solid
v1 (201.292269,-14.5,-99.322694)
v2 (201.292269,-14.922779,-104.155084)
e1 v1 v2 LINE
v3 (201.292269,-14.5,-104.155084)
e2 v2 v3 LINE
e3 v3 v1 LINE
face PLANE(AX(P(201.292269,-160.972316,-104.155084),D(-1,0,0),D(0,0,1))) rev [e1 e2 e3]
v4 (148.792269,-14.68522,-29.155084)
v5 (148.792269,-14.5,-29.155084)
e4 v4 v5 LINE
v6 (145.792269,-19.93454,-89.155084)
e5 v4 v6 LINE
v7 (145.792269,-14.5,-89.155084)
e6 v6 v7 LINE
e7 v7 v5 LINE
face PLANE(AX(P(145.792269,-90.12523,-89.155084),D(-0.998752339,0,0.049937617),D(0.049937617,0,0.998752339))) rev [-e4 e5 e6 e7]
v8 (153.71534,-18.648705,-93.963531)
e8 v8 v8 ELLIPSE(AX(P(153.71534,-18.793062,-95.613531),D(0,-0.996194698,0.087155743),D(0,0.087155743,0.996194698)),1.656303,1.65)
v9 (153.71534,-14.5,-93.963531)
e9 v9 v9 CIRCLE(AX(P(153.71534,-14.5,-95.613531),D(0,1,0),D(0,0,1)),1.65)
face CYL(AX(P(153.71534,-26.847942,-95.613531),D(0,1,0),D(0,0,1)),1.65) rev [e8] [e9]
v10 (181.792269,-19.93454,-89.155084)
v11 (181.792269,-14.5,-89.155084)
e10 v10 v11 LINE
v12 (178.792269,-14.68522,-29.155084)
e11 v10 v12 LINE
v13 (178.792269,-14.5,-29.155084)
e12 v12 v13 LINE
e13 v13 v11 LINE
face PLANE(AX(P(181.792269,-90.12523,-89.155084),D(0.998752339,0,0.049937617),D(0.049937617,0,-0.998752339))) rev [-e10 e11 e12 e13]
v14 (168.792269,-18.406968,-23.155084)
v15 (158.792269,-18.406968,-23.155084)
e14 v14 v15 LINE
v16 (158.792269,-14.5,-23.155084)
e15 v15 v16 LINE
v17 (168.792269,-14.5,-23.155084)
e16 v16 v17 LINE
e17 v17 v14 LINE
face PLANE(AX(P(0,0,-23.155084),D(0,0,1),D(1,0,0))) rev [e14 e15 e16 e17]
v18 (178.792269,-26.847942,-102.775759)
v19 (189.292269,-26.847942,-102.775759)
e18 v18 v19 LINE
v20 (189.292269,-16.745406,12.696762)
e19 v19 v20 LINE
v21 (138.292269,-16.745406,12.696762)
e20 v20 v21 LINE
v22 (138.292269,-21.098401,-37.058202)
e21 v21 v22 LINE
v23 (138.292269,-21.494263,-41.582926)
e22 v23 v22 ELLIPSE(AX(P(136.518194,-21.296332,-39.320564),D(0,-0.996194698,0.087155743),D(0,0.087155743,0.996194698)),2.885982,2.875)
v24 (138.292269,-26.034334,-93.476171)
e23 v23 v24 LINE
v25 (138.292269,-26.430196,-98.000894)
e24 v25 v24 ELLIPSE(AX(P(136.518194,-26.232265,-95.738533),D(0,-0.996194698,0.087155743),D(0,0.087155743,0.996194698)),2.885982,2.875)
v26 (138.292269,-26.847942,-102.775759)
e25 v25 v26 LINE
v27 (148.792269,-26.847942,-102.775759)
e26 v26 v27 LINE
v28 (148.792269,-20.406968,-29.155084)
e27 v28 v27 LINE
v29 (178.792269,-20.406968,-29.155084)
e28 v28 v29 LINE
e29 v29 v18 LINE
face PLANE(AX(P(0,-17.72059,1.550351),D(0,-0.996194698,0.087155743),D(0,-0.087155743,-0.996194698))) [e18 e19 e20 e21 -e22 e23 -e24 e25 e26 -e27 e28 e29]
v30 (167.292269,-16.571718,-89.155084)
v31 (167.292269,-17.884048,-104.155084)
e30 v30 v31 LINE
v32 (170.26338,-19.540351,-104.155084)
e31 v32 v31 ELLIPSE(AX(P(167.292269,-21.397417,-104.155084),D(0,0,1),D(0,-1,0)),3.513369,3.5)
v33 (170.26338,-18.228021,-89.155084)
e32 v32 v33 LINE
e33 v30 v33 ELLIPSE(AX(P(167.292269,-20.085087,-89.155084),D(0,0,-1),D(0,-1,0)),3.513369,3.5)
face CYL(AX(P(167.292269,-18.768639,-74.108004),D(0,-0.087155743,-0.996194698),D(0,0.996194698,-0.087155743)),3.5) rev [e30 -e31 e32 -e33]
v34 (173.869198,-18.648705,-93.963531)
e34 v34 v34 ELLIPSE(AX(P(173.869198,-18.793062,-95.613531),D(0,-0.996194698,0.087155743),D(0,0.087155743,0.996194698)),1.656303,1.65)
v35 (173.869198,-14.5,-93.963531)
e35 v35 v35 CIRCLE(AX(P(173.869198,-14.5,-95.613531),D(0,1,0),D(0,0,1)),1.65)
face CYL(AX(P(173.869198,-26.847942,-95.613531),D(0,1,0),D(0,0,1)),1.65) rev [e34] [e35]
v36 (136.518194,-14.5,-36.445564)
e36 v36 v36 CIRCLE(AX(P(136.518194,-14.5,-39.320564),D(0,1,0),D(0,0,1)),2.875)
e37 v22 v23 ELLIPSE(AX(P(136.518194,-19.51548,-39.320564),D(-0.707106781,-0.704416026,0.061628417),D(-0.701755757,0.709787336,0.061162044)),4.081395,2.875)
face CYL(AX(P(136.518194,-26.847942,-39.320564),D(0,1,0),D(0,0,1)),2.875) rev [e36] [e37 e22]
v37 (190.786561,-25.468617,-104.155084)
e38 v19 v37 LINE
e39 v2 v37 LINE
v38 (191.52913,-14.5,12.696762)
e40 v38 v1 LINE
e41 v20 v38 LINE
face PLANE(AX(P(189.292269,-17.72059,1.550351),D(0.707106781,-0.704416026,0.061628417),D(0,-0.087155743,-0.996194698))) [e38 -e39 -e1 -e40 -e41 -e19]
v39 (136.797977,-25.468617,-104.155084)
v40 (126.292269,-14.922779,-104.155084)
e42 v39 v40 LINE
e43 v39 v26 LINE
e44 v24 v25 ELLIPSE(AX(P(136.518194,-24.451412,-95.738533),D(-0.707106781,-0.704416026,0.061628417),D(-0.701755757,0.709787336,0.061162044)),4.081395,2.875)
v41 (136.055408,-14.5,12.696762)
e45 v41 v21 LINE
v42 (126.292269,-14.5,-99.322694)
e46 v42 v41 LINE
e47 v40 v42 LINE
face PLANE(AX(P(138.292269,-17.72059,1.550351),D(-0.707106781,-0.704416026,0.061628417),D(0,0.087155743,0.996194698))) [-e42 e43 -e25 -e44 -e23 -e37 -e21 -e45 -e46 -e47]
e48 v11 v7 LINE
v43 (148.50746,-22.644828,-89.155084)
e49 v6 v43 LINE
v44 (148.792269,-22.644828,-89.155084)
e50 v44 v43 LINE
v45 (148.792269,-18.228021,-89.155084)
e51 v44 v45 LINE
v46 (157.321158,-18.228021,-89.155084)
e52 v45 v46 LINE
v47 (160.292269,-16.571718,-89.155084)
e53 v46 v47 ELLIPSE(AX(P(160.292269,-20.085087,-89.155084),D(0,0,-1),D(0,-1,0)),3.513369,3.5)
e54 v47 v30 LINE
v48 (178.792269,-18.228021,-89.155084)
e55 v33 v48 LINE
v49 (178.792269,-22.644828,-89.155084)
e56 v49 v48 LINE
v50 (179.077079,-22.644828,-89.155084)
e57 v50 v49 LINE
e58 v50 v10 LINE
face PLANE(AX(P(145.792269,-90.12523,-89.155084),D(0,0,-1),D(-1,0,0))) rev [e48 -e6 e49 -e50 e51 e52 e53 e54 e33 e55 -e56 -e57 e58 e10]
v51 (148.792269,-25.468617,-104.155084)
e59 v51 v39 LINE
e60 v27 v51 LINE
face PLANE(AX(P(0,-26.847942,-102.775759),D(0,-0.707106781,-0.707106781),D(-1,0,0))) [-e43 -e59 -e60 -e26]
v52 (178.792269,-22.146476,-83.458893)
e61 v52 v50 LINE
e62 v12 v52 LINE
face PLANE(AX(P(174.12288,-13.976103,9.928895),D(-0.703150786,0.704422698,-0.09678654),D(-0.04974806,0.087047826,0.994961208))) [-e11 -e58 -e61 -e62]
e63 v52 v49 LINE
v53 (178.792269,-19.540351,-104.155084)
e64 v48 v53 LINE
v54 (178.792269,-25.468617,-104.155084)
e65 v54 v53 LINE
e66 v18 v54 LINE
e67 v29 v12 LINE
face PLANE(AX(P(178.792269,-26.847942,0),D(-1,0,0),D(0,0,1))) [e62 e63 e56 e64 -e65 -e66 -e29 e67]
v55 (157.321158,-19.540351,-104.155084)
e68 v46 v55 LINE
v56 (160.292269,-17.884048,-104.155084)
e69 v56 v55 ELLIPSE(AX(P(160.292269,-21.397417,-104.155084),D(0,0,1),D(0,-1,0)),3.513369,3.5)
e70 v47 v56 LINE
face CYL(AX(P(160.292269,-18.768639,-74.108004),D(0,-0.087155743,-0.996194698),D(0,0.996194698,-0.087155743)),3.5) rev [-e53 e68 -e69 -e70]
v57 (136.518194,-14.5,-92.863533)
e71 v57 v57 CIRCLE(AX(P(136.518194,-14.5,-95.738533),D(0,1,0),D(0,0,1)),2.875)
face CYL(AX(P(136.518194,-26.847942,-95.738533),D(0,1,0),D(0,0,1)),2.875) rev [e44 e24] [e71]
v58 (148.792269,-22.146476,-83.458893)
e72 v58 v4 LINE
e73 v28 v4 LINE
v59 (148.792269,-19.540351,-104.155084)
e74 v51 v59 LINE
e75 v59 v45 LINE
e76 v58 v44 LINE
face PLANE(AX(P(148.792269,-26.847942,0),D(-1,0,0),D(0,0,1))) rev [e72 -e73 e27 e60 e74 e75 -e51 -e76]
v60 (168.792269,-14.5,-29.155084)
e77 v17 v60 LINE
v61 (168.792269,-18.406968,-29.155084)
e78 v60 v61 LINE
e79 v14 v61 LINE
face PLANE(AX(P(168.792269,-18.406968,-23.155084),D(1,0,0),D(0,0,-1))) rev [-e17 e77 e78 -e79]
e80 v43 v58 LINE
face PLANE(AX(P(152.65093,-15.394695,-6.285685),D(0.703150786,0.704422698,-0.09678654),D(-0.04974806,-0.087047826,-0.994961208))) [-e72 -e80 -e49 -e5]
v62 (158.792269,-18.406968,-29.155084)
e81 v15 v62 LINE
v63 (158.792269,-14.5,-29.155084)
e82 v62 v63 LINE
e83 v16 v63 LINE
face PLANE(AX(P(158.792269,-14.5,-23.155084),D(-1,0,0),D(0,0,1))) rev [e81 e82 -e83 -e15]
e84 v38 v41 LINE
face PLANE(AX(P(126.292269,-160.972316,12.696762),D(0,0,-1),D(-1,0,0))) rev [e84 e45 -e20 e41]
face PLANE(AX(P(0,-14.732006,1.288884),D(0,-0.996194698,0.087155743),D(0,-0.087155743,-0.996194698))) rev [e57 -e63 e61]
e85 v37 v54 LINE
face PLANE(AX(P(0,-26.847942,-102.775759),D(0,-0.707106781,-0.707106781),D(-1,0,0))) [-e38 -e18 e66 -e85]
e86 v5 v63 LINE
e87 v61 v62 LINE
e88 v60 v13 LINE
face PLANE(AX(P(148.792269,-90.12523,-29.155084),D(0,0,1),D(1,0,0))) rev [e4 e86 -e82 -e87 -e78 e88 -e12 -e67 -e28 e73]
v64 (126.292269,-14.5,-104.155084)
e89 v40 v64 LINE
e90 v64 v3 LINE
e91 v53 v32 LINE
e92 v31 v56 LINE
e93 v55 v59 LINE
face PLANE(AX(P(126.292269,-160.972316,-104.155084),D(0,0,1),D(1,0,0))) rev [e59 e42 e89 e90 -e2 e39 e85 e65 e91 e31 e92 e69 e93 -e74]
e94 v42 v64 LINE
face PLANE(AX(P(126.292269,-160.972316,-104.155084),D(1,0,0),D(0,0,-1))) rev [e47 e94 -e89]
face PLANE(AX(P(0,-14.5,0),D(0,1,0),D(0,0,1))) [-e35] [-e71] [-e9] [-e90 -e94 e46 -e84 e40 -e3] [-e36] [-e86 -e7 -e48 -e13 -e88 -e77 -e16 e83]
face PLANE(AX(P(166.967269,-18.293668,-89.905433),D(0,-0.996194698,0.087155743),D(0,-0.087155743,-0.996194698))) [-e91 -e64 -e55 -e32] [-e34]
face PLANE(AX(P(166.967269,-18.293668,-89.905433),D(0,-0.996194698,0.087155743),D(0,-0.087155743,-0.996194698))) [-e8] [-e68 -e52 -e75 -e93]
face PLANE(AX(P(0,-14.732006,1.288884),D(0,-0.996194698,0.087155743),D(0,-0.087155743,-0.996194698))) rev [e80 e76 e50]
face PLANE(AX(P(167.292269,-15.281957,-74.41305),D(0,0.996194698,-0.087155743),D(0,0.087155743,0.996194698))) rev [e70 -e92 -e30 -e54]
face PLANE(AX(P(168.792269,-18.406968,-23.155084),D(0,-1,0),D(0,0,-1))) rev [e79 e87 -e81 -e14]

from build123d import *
from OCP.BRepFilletAPI import BRepFilletAPI_MakeChamfer

# Parameters (mm, degrees)
BOSS_EXTRUDE1_START = 126.292269218
BOSS_EXTRUDE1_DEPTH = 75
CHAMFER1_SIZE       = 12
CHAMFER2_SIZE       = 1.5
CHAMFER2_SIZE2      = 1.38459352
CUT_EXTRUDE1_REACH  = 228.979
SKETCH5_R           = 2.875
CUT_EXTRUDE2_DEPTH  = 227.978701072
SKETCH6_W           = 30
SKETCH6_H           = 15
SKETCH6_R           = 2.875
SKETCH6_H_2         = 60
CUT_EXTRUDE3_DEPTH  = 227.978701072
BOSS_EXTRUDE2_START = 148.792269218
BOSS_EXTRUDE2_DEPTH = 30
CUT_EXTRUDE4_DEPTH  = 30
SKETCH11_R          = 1.65
CUT_EXTRUDE5_DEPTH  = 227.978701072
SKETCH12_W          = 10
SKETCH12_H          = 3.906967626
CUT_EXTRUDE6_DEPTH  = 6
CHAMFER3_SIZE       = 2.7
CHAMFER3_SIZE2      = 2.711828512


# Read off the part's stored shape, not the designer's step: Boss-Extrude1, Boss-Extrude2
with BuildPart() as part:
    # Boss-Extrude1 outline → Boss-Extrude1 (new body)
    with BuildSketch(Plane.YZ.offset(BOSS_EXTRUDE1_START)):
        Polygon((-26.968617391, -104.155083501), (-14.5, -104.155083501), (-14.5, 12.696761663), (-16.745405627, 12.696761663), align=None)
    extrude(amount=BOSS_EXTRUDE1_DEPTH)

    # Chamfer1
    chamfer1_edges = [part.edges().sort_by_distance(p)[0] for p in [
        (201.292269218, -21.857011509, -45.729160919),
        (126.292269218, -21.857011509, -45.729160919),
    ]]
    chamfer(chamfer1_edges, length=CHAMFER1_SIZE)

    # Chamfer2
    chamfer2_edges = [part.edges().sort_by_distance(p)[0] for p in [
        (163.792269218, -26.968617391, -104.155083501),
    ]]
    chamfer2_side = [part.faces().sort_by_distance(p)[0] for p in [
        (163.792269218, -20.328588559, -104.155083501),
    ]]
    chamfer(chamfer2_edges, length=CHAMFER2_SIZE, length2=CHAMFER2_SIZE2, reference=chamfer2_side[0])

    # Cut-Extrude1: up to this plane
    cut_extrude1_end = Plane(origin=(0, -14.732006126, 1.288883527), z_dir=(0, -0.9961946980917461, 0.08715574274765119))
    # Sketch3 → Cut-Extrude1 (cut, up to the surface)
    with BuildSketch(Plane(origin=(0, -14.5, 0), x_dir=(1, 0, 0), z_dir=(0, 1, 0)), mode=Mode.PRIVATE) as cut_extrude1_sk1:
        Polygon((145.792269218, 89.155083501), (181.792269218, 89.155083501), (178.792269218, 29.155083501), (148.792269218, 29.155083501), align=None)
    cut_extrude1_tool1 = split(extrude(cut_extrude1_sk1.sketch, amount=-CUT_EXTRUDE1_REACH, mode=Mode.PRIVATE), bisect_by=cut_extrude1_end, keep=Keep.BOTH, mode=Mode.PRIVATE)
    add(cut_extrude1_tool1.solids().sort_by_distance((163.792269, -14.5, -60.064174))[0], mode=Mode.SUBTRACT)

    # Sketch5 → Cut-Extrude2 (cut, through all)
    with BuildSketch(Plane(origin=(0, -14.5, 0), x_dir=(1, 0, 0), z_dir=(0, 1, 0))):
        with Locations(Location((173.869198237, 95.613531365, 0), (0, 0, 270))):
            Circle(SKETCH5_R)
        with Locations(Location((136.518193504, 95.738532693, 0), (0, 0, 270))):
            Circle(SKETCH5_R)
        with Locations(Location((136.518193504, 39.320563904, 0), (0, 0, 270))):
            Circle(SKETCH5_R)
    extrude(amount=-CUT_EXTRUDE2_DEPTH, mode=Mode.SUBTRACT)

    # Sketch6 → Cut-Extrude3 (cut, through all)
    # profile 1 of 2: a face of its own
    with BuildSketch(Plane(origin=(0, -14.5, 0), x_dir=(1, 0, 0), z_dir=(0, 1, 0))):
        with Locations((163.792269218, 96.655083501)):
            Rectangle(SKETCH6_W, SKETCH6_H)
        with Locations((173.869198237, 95.613531365)):
            Circle(SKETCH6_R, mode=Mode.SUBTRACT)
    # profile 2 of 2: a face of its own
    with BuildSketch(Plane(origin=(0, -14.5, 0), x_dir=(1, 0, 0), z_dir=(0, 1, 0))):
        with Locations((163.792269218, 59.155083501)):
            Rectangle(SKETCH6_W, SKETCH6_H_2)
    extrude(amount=-CUT_EXTRUDE3_DEPTH, mode=Mode.SUBTRACT)

    # Boss-Extrude2 outline → Boss-Extrude2 (add)
    with BuildSketch(Plane.YZ.offset(BOSS_EXTRUDE2_START)):
        Polygon((-19.540350593, -104.155083501), (-14.5, -104.155083501), (-14.5, -89.155083501), (-18.22802064, -89.155083501), align=None)
    extrude(amount=BOSS_EXTRUDE2_DEPTH)

    # Sketch9 → Cut-Extrude4 (cut)
    with BuildSketch(Plane(origin=(0, -9.191601139, -105.06048176), x_dir=(-1, 0, 0), z_dir=(0, -0.08715574274765119, -0.9961946980917462))):
        with BuildLine():
            Line((-167.292269218, -8.738279996), (-160.292269218, -8.738279996))
            ThreePointArc((-160.292269218, -8.738279996), (-156.792269218, -12.238279996), (-160.292269218, -15.738279996))
            Line((-160.292269218, -15.738279996), (-167.292269218, -15.738279996))
            ThreePointArc((-167.292269218, -15.738279996), (-170.792269218, -12.238279996), (-167.292269218, -8.738279996))
        make_face()
    extrude(amount=-CUT_EXTRUDE4_DEPTH, mode=Mode.SUBTRACT)

    # Sketch11 → Cut-Extrude5 (cut, through all)
    with BuildSketch(Plane(origin=(0, -14.5, 0), x_dir=(1, 0, 0), z_dir=(0, 1, 0))):
        with Locations(Location((173.869198237, 95.613531365, 0), (0, 0, 270))):
            Circle(SKETCH11_R)
        with Locations(Location((153.7153402, 95.613531365, 0), (0, 0, 270))):
            Circle(SKETCH11_R)
    extrude(amount=-CUT_EXTRUDE5_DEPTH, mode=Mode.SUBTRACT)

    # Sketch12 → Cut-Extrude6 (cut)
    with BuildSketch(Plane(origin=(0, 0, -29.155083501), x_dir=(-1, 0, 0), z_dir=(0, 0, -1))):
        with Locations((-163.792269218, -16.453483813)):
            Rectangle(SKETCH12_W, SKETCH12_H)
    extrude(amount=-CUT_EXTRUDE6_DEPTH, mode=Mode.SUBTRACT)

    # Chamfer3: one chamfer whose edges measure the first distance from different faces: ONE call of the kernel's chamfer builder (chamfer() names one face for all edges)
    chamfer3_edges_1 = [part.edges().sort_by_distance(p)[0] for p in [
        (180.292269218, -20.020168019, -59.155083501),
    ]]
    chamfer3_side_1 = [part.faces().sort_by_distance(p)[0] for p in [
        (180.530002915, -17.468074044, -63.909757447),
    ]]
    chamfer3_edges_2 = [part.edges().sort_by_distance(p)[0] for p in [
        (147.292269218, -20.020168019, -59.155083501),
    ]]
    chamfer3_side_2 = [part.faces().sort_by_distance(p)[0] for p in [
        (147.054535521, -17.468074044, -63.909757447),
    ]]
    chamfer3 = BRepFilletAPI_MakeChamfer(part.part.solid().wrapped)
    for e in chamfer3_edges_1:
        chamfer3.Add(CHAMFER3_SIZE, CHAMFER3_SIZE2, e.wrapped, chamfer3_side_1[0].wrapped)  # the first distance lies on this face
    for e in chamfer3_edges_2:
        chamfer3.Add(CHAMFER3_SIZE, CHAMFER3_SIZE2, e.wrapped, chamfer3_side_2[0].wrapped)  # the first distance lies on this face
    add(Compound.cast(chamfer3.Shape()), mode=Mode.REPLACE)


solid = part.part
